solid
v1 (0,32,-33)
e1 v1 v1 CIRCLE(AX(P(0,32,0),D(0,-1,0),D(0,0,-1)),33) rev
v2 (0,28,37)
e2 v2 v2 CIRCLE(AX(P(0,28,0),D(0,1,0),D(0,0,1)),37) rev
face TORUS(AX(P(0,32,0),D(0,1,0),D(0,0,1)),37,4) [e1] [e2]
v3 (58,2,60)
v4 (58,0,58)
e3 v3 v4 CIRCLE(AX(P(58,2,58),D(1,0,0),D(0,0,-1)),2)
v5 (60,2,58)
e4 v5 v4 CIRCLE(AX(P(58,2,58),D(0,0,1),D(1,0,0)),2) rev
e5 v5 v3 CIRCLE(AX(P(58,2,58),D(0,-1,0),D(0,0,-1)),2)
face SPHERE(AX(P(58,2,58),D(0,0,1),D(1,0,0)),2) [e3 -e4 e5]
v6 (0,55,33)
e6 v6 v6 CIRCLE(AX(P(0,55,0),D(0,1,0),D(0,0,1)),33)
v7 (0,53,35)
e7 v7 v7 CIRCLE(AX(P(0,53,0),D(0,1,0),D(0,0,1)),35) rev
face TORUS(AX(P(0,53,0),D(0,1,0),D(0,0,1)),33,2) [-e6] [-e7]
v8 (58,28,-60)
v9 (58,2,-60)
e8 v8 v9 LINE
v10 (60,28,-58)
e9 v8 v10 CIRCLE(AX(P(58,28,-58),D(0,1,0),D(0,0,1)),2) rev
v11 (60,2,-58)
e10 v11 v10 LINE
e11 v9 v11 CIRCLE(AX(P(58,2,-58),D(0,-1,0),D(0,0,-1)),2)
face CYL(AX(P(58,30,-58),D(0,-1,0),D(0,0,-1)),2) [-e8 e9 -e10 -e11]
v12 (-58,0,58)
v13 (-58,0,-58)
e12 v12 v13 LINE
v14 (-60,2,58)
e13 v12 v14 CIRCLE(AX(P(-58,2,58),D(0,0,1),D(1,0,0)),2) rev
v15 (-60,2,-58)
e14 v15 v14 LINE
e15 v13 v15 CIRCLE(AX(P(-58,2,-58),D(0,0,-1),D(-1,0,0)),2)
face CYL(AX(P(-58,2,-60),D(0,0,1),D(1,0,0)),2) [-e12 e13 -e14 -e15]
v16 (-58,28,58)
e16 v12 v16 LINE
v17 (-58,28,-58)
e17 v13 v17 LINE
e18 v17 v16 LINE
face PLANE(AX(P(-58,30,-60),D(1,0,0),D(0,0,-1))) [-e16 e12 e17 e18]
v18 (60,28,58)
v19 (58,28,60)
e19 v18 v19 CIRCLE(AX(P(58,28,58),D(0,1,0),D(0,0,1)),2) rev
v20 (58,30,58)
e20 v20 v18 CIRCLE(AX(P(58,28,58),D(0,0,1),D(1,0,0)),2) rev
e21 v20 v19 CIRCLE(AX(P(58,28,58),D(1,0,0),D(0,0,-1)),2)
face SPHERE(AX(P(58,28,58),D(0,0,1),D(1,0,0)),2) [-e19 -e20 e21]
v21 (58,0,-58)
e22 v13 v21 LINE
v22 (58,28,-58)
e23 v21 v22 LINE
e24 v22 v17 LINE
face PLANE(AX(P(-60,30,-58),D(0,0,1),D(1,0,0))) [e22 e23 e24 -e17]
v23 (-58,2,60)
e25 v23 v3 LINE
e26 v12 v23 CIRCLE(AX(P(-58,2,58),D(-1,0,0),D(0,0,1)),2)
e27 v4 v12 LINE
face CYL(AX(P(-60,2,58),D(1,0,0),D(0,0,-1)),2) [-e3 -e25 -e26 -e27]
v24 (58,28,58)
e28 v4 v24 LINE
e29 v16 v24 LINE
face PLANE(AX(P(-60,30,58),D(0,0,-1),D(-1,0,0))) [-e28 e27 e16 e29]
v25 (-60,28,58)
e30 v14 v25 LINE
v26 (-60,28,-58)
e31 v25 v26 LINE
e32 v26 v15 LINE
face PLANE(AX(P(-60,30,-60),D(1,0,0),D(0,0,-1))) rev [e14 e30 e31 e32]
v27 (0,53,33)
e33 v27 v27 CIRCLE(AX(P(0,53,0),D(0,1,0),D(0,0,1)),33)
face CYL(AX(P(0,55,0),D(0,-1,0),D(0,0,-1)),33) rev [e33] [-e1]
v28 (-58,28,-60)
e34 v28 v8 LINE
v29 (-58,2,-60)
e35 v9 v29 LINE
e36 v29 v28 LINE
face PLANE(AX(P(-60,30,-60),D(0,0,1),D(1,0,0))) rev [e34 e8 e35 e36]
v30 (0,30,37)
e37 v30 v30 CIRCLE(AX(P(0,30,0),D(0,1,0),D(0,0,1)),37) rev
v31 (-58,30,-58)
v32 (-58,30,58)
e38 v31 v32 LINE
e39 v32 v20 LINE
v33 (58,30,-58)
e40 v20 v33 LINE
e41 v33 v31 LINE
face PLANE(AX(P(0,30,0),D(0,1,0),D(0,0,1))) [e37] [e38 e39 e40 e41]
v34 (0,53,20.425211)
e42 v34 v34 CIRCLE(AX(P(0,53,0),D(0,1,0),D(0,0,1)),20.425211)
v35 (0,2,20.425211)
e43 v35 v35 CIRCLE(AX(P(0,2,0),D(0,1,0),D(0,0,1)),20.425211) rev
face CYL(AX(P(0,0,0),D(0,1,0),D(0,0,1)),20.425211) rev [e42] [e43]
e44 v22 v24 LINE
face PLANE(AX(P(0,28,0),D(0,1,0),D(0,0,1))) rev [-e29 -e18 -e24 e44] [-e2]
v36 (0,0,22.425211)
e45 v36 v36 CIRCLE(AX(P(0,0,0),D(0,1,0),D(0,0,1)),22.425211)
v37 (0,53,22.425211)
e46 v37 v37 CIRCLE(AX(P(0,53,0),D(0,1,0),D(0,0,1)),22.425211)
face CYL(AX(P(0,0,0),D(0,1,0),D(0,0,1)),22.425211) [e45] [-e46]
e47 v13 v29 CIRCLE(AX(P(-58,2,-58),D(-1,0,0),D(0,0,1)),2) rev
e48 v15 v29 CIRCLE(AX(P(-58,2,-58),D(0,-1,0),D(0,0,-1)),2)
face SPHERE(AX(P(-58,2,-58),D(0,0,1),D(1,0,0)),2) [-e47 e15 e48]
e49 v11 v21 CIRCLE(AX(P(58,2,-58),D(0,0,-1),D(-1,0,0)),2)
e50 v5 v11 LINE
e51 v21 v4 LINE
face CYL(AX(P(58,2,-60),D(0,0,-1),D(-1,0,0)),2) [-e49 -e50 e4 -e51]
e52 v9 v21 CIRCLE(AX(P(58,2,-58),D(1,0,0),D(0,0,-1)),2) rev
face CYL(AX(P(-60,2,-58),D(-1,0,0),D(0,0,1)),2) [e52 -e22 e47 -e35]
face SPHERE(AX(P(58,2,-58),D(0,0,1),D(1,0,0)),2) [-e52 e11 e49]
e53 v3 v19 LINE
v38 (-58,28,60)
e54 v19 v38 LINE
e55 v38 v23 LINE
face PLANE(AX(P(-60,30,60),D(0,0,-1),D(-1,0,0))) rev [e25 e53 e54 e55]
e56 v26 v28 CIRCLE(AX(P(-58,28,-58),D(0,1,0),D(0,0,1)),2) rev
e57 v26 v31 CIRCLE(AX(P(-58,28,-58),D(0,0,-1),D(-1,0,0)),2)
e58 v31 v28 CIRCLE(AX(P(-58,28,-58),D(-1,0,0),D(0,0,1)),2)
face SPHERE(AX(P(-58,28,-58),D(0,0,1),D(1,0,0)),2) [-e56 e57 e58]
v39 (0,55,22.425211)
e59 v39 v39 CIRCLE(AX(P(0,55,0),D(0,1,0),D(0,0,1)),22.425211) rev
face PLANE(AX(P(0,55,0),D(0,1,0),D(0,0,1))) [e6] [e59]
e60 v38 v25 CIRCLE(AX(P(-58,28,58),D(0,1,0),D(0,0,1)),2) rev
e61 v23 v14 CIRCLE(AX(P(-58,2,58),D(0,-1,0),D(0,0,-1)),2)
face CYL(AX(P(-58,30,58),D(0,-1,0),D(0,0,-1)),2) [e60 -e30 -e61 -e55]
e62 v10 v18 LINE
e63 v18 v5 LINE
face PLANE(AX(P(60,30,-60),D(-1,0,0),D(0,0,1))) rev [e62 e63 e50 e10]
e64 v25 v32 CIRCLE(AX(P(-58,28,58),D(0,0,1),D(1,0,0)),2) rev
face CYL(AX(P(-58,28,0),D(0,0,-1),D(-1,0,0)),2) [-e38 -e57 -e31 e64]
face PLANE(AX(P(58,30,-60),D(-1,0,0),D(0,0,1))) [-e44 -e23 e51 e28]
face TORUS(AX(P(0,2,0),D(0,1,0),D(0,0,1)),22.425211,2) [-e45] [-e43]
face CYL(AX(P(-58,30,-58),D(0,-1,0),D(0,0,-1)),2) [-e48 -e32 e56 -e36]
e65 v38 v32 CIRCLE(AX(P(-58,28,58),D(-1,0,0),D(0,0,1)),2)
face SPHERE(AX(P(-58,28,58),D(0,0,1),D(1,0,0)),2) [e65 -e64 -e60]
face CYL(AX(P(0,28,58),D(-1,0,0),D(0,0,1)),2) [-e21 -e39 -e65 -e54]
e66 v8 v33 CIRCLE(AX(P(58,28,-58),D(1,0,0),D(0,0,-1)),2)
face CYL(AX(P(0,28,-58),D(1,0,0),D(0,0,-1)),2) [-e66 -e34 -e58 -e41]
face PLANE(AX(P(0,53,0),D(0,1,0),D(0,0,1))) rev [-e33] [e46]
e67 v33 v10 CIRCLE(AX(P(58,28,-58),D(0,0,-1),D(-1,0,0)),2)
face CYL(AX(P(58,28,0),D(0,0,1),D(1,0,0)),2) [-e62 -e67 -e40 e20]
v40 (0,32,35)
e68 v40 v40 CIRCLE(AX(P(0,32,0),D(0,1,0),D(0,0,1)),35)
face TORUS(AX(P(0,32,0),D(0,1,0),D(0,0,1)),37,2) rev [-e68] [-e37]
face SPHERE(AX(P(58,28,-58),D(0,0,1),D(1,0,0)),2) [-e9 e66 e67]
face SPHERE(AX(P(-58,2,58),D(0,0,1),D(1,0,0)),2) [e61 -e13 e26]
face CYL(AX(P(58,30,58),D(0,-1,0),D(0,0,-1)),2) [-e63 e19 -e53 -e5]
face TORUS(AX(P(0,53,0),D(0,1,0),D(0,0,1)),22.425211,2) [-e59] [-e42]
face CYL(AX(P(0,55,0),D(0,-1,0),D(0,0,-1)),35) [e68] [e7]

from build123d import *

# Parameters (mm, degrees)
SKETCH1_W            = 120
SKETCH1_H            = 120
BOSS_EXTRUDE1_DEPTH  = 30
SKETCH2_R            = 35
BOSS_EXTRUDE2_DEPTH  = 25
SKETCH3_R            = 20.425210732
CUT_EXTRUDE1_DEPTH   = 102.118742081
FILLET10_R           = 2
SHELL1_OUTLINE_W     = 116
SHELL1_OUTLINE_H     = 116
SHELL1_OUTLINE_R     = 22.425210732
SHELL1_DEPTH         = 28
SHELL1_START         = 28
SHELL1_2_OUTLINE_R   = 33
SHELL1_2_OUTLINE_R_2 = 22.425210732
SHELL1_2_DEPTH       = 25


with BuildPart() as part:
    # Sketch1 → Boss-Extrude1 (new body)
    with BuildSketch(Plane(origin=(0, 0, 0), x_dir=(1, 0, 0), z_dir=(0, 1, 0))):
        Rectangle(SKETCH1_W, SKETCH1_H)
    extrude(amount=BOSS_EXTRUDE1_DEPTH)

    # Sketch2 → Boss-Extrude2 (add)
    with BuildSketch(Plane(origin=(0, 30, 0), x_dir=(1, 0, 0), z_dir=(0, 1, 0))):
        with Locations(Location((0, 0, 0), (0, 0, 270))):
            Circle(SKETCH2_R)
    extrude(amount=BOSS_EXTRUDE2_DEPTH)

    # Sketch3 → Cut-Extrude1 (cut, through all)
    with BuildSketch(Plane(origin=(0, 55, 0), x_dir=(1, 0, 0), z_dir=(0, 1, 0))):
        with Locations(Location((0, 0, 0), (0, 0, 270))):
            Circle(SKETCH3_R)
    extrude(amount=-CUT_EXTRUDE1_DEPTH, mode=Mode.SUBTRACT)

    # Fillet10
    fillet10_edges = [part.edges().sort_by_distance(p)[0] for p in [
        (-60, 30, 0),
        (0, 30, -35),
        (0, 55, -35),
        (0, 30, 60),
        (0, 0, -20.425210732),
        (0, 55, -20.425210732),
        (60, 30, 0),
        (0, 0, 60),
        (-60, 0, 0),
        (0, 0, -60),
        (60, 0, 0),
        (60, 15, 60),
        (-60, 15, 60),
        (-60, 15, -60),
        (60, 15, -60),
        (0, 30, -60),
    ]]
    fillet(fillet10_edges, radius=FILLET10_R)

    # Shell1: read off the stored shape, not the designer's step
    # Shell1 outline → Shell1 (cut)
    with BuildSketch(Plane(origin=(0, 0, 0), x_dir=(1, 0, 0), z_dir=(0, 1, 0))):
        Rectangle(SHELL1_OUTLINE_W, SHELL1_OUTLINE_H)
        Circle(SHELL1_OUTLINE_R, mode=Mode.SUBTRACT)
    extrude(amount=SHELL1_DEPTH, mode=Mode.SUBTRACT)

    # Shell1 2 outline → Shell1 2 (cut)
    with BuildSketch(Plane(origin=(0, 0, 0), x_dir=(1, 0, 0), z_dir=(0, 1, 0)).offset(SHELL1_START)):
        Circle(SHELL1_2_OUTLINE_R)
        Circle(SHELL1_2_OUTLINE_R_2, mode=Mode.SUBTRACT)
    extrude(amount=SHELL1_2_DEPTH, mode=Mode.SUBTRACT)

    # Shell1 3 outline → Shell1 3 (revolve, cut)
    with BuildSketch(Plane.XY):
        with BuildLine():
            ThreePointArc((37, 28), (34.171572875, 29.171572875), (33, 32))
            Line((33, 32), (33, 28))
            Line((33, 28), (37, 28))
        make_face()
    revolve(axis=Axis((0, 0, 0), (0, 1, 0)), mode=Mode.SUBTRACT)


solid = part.part
